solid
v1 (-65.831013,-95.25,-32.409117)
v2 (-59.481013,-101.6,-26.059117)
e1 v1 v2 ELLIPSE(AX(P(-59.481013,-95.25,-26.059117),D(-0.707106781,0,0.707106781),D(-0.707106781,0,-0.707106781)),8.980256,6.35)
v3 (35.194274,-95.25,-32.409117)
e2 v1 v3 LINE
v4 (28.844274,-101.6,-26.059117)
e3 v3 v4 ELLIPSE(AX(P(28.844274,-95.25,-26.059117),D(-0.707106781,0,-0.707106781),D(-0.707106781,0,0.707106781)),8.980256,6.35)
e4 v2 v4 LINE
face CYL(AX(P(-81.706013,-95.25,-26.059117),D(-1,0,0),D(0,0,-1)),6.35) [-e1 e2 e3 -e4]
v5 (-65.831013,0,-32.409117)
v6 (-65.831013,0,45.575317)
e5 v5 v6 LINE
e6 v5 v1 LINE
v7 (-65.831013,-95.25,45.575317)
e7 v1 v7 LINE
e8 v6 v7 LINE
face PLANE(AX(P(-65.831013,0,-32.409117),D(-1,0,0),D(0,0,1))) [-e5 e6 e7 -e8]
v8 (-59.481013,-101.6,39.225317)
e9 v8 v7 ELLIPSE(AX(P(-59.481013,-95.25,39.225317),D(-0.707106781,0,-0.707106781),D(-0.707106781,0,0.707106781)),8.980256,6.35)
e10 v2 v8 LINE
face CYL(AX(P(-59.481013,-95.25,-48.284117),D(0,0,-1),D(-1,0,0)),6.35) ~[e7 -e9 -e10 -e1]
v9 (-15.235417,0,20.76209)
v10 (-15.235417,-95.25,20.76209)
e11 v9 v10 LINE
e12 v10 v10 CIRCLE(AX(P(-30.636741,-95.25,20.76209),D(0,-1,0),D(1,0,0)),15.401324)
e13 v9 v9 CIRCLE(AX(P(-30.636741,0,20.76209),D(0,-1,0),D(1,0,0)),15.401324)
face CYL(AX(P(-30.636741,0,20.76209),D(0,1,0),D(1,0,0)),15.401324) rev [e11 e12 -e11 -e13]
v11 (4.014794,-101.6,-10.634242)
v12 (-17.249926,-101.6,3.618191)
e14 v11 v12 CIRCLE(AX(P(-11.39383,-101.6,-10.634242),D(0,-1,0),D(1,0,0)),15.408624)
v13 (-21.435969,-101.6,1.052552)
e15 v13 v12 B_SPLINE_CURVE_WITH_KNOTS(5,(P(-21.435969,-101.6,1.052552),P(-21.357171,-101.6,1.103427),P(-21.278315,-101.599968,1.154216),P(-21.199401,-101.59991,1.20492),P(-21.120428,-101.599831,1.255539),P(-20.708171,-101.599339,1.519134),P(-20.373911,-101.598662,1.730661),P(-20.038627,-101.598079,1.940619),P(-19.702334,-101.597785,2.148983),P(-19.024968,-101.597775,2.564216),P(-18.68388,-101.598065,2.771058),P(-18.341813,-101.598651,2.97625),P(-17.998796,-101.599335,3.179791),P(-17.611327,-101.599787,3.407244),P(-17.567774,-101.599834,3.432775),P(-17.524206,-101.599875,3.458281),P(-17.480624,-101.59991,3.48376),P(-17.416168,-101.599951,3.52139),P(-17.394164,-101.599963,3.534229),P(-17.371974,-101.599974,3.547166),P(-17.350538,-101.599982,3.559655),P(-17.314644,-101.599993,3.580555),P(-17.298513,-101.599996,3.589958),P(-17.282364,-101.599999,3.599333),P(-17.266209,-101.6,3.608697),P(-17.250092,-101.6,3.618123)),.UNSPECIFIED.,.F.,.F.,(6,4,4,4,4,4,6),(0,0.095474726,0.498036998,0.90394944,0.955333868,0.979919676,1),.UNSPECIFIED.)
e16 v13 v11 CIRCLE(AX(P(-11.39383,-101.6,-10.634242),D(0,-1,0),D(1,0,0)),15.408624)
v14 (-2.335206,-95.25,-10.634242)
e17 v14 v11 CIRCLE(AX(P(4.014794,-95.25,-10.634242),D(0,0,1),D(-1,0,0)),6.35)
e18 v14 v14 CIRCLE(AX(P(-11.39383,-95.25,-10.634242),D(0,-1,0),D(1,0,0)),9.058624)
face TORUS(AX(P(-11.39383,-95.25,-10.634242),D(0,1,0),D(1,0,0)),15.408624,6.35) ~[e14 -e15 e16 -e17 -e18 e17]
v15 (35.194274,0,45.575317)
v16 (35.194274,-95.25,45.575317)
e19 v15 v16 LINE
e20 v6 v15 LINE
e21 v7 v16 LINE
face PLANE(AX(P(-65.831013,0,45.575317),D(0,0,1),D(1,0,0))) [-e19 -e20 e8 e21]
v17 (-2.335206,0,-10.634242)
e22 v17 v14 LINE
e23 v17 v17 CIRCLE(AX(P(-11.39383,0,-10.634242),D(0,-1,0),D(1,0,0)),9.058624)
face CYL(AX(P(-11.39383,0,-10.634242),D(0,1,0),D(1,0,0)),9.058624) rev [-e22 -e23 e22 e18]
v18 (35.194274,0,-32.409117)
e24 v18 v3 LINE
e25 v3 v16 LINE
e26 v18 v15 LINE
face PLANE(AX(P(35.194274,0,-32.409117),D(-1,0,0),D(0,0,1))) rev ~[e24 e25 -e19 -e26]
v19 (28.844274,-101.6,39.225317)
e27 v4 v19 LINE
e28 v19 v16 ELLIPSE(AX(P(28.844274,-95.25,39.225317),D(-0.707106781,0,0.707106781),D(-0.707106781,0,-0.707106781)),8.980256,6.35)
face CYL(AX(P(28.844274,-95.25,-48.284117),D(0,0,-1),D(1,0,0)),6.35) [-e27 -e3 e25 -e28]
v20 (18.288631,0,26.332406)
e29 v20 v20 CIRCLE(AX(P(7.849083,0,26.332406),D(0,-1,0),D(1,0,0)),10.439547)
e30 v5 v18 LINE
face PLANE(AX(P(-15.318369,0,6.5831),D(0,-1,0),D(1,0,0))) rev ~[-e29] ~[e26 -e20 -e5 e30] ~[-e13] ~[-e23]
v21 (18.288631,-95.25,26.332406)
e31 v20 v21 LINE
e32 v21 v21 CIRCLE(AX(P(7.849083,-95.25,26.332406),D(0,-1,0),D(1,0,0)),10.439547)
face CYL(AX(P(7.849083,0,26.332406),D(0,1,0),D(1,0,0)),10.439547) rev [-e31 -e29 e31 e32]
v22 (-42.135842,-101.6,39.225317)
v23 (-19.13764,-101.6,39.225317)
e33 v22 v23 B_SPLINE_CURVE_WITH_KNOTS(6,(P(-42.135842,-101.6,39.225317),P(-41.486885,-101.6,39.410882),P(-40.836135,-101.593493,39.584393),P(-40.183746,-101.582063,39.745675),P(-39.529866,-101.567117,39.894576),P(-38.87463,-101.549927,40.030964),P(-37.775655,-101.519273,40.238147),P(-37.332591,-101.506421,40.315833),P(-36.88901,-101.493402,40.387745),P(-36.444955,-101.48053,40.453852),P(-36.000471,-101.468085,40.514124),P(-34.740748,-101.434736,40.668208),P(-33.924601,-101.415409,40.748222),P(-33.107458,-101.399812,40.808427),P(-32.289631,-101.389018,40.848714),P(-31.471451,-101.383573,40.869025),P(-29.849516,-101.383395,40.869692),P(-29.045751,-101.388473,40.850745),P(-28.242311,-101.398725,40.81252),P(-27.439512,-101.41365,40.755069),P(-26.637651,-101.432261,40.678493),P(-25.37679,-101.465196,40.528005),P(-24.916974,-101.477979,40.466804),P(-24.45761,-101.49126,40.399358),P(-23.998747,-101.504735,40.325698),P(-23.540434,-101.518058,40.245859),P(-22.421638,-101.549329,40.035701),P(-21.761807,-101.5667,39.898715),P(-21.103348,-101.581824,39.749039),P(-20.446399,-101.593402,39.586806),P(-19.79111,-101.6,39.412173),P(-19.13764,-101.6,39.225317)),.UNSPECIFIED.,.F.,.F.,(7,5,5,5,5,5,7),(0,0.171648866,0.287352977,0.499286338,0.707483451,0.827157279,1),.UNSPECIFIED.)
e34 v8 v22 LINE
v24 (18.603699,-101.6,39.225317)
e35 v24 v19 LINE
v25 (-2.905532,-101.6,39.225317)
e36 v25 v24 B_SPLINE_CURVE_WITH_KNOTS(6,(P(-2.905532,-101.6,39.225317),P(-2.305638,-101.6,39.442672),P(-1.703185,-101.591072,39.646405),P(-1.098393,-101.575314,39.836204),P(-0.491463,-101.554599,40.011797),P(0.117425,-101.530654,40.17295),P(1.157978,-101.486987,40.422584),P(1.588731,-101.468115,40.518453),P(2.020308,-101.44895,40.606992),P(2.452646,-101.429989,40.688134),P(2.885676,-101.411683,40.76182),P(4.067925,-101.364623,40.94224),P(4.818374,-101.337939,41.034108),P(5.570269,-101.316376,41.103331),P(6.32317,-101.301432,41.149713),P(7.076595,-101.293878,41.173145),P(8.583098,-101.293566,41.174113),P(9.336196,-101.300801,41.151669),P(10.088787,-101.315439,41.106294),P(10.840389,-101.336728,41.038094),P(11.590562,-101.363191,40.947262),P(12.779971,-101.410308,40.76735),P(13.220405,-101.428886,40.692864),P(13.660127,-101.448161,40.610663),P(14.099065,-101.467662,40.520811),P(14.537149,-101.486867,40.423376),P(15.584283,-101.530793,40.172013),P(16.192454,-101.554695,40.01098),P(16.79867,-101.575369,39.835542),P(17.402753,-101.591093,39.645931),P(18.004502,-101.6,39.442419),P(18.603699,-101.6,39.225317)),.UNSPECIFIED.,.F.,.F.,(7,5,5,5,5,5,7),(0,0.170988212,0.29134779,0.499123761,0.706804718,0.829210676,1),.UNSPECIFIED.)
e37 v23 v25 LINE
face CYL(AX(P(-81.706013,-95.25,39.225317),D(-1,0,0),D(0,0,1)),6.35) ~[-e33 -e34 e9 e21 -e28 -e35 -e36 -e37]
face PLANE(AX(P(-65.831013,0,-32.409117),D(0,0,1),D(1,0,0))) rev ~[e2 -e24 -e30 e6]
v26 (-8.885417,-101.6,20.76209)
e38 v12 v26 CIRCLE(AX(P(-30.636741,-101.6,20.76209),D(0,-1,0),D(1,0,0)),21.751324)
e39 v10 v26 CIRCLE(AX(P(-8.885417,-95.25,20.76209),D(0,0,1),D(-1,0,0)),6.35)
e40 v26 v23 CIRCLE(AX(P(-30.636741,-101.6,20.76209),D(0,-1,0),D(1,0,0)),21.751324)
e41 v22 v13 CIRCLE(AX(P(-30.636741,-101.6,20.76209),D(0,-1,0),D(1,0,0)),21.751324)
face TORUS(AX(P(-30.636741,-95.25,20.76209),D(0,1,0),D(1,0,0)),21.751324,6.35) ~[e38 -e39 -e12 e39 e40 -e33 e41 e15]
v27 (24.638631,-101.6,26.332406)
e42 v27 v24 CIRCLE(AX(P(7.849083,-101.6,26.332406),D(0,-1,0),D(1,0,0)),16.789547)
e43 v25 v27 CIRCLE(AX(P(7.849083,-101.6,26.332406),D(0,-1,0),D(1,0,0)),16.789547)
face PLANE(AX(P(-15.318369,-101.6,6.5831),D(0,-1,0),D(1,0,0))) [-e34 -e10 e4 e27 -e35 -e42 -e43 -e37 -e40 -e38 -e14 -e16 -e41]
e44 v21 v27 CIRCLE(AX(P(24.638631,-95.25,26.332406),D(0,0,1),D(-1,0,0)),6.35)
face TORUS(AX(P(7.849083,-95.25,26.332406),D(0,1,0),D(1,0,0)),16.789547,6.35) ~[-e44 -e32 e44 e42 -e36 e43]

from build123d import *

# Parameters (mm, degrees)
F0_W        = 101.0252870619
F0_H        = 77.9844336212
F0_R        = 9.0586238997
F0_R_2      = 15.4013236799
F0_R_3      = 10.4395473454
F1_DEPTH    = 101.6
F2_T1_DEPTH = 132.7752870619
F2_T3_DEPTH = 109.7344336212


# Not quite as in the source:
# - a fillet or chamfer that OpenCascade refuses, or shapes differently, is made with other operations: its cross-section is extruded or revolved along the edge and cut away or added
# - a feature of the source that left no trace in its solid (it failed there, or was rolled back) is left out


with BuildPart() as f1:
    # F0 (on Front) → F1 (new body)
    with BuildSketch(Plane.XZ):
        with Locations((-15.3183694929, 6.5831001848)):
            Rectangle(F0_W, F0_H)
        with Locations((-11.3938301802, -10.6342416257)):
            Circle(F0_R, mode=Mode.SUBTRACT)
        with Locations((-30.6367408484, 20.7620896399)):
            Circle(F0_R_2, mode=Mode.SUBTRACT)
        with Locations((7.8490832821, 26.3324063271)):
            Circle(F0_R_3, mode=Mode.SUBTRACT)
    extrude(amount=F1_DEPTH)

    # F2: fillet of radius 6.35 on 7 edges, made by hand

    # F2_s2 → F2_t1 (cut)
    with BuildSketch(Plane.YZ.offset(-81.7060130239)):
        with BuildLine():
            ThreePointArc((-95.25, 45.5753169954), (-99.7401280605, 43.7154450559), (-101.6, 39.2253169954))
            Line((-101.6, 39.2253169954), (-101.6, 45.5753169954))
            Line((-101.6, 45.5753169954), (-95.25, 45.5753169954))
        make_face()
        with BuildLine():
            ThreePointArc((-95.25, -32.4091166258), (-99.7401280605, -30.5492446863), (-101.6, -26.0591166258))
            Line((-101.6, -26.0591166258), (-101.6, -32.4091166258))
            Line((-101.6, -32.4091166258), (-95.25, -32.4091166258))
        make_face()
    extrude(amount=F2_T1_DEPTH, mode=Mode.SUBTRACT)

    # F2_s4 → F2_t3 (cut)
    with BuildSketch(Plane.XY.offset(-48.2841166258)):
        with BuildLine():
            ThreePointArc((-65.8310130239, -95.25), (-63.9711410844, -99.7401280605), (-59.4810130239, -101.6))
            Line((-59.4810130239, -101.6), (-65.8310130239, -101.6))
            Line((-65.8310130239, -101.6), (-65.8310130239, -95.25))
        make_face()
        with BuildLine():
            ThreePointArc((35.1942740381, -95.25), (33.3344020986, -99.7401280605), (28.8442740381, -101.6))
            Line((28.8442740381, -101.6), (35.1942740381, -101.6))
            Line((35.1942740381, -101.6), (35.1942740381, -95.25))
        make_face()
    extrude(amount=F2_T3_DEPTH, mode=Mode.SUBTRACT)

    # F2_s5 → F2_t6 (revolve, cut)
    with BuildSketch(Plane.XY.offset(-10.6342416257)):
        with BuildLine():
            ThreePointArc((-2.3352062804, -95.25), (-0.475334341, -99.7401280605), (4.0147937196, -101.6))
            Line((4.0147937196, -101.6), (-2.3352062804, -101.6))
            Line((-2.3352062804, -101.6), (-2.3352062804, -95.25))
        make_face()
    revolve(axis=Axis((-11.3938301802, -101.6, -10.6342416257), (0, -1, 0)), mode=Mode.SUBTRACT)

    # F2_s7 → F2_t8 (revolve, cut)
    with BuildSketch(Plane.XY.offset(20.7620896399)):
        with BuildLine():
            ThreePointArc((-15.2354171685, -95.25), (-13.375545229, -99.7401280605), (-8.8854171685, -101.6))
            Line((-8.8854171685, -101.6), (-15.2354171685, -101.6))
            Line((-15.2354171685, -101.6), (-15.2354171685, -95.25))
        make_face()
    revolve(axis=Axis((-30.6367408484, -101.6, 20.7620896399), (0, -1, 0)), mode=Mode.SUBTRACT)

    # F2_s9 → F2_t10 (revolve, cut)
    with BuildSketch(Plane.XY.offset(26.3324063271)):
        with BuildLine():
            ThreePointArc((18.2886306275, -95.25), (20.1485025669, -99.7401280605), (24.6386306275, -101.6))
            Line((24.6386306275, -101.6), (18.2886306275, -101.6))
            Line((18.2886306275, -101.6), (18.2886306275, -95.25))
        make_face()
    revolve(axis=Axis((7.8490832821, -101.6, 26.3324063271), (0, -1, 0)), mode=Mode.SUBTRACT)


solid = f1.part
